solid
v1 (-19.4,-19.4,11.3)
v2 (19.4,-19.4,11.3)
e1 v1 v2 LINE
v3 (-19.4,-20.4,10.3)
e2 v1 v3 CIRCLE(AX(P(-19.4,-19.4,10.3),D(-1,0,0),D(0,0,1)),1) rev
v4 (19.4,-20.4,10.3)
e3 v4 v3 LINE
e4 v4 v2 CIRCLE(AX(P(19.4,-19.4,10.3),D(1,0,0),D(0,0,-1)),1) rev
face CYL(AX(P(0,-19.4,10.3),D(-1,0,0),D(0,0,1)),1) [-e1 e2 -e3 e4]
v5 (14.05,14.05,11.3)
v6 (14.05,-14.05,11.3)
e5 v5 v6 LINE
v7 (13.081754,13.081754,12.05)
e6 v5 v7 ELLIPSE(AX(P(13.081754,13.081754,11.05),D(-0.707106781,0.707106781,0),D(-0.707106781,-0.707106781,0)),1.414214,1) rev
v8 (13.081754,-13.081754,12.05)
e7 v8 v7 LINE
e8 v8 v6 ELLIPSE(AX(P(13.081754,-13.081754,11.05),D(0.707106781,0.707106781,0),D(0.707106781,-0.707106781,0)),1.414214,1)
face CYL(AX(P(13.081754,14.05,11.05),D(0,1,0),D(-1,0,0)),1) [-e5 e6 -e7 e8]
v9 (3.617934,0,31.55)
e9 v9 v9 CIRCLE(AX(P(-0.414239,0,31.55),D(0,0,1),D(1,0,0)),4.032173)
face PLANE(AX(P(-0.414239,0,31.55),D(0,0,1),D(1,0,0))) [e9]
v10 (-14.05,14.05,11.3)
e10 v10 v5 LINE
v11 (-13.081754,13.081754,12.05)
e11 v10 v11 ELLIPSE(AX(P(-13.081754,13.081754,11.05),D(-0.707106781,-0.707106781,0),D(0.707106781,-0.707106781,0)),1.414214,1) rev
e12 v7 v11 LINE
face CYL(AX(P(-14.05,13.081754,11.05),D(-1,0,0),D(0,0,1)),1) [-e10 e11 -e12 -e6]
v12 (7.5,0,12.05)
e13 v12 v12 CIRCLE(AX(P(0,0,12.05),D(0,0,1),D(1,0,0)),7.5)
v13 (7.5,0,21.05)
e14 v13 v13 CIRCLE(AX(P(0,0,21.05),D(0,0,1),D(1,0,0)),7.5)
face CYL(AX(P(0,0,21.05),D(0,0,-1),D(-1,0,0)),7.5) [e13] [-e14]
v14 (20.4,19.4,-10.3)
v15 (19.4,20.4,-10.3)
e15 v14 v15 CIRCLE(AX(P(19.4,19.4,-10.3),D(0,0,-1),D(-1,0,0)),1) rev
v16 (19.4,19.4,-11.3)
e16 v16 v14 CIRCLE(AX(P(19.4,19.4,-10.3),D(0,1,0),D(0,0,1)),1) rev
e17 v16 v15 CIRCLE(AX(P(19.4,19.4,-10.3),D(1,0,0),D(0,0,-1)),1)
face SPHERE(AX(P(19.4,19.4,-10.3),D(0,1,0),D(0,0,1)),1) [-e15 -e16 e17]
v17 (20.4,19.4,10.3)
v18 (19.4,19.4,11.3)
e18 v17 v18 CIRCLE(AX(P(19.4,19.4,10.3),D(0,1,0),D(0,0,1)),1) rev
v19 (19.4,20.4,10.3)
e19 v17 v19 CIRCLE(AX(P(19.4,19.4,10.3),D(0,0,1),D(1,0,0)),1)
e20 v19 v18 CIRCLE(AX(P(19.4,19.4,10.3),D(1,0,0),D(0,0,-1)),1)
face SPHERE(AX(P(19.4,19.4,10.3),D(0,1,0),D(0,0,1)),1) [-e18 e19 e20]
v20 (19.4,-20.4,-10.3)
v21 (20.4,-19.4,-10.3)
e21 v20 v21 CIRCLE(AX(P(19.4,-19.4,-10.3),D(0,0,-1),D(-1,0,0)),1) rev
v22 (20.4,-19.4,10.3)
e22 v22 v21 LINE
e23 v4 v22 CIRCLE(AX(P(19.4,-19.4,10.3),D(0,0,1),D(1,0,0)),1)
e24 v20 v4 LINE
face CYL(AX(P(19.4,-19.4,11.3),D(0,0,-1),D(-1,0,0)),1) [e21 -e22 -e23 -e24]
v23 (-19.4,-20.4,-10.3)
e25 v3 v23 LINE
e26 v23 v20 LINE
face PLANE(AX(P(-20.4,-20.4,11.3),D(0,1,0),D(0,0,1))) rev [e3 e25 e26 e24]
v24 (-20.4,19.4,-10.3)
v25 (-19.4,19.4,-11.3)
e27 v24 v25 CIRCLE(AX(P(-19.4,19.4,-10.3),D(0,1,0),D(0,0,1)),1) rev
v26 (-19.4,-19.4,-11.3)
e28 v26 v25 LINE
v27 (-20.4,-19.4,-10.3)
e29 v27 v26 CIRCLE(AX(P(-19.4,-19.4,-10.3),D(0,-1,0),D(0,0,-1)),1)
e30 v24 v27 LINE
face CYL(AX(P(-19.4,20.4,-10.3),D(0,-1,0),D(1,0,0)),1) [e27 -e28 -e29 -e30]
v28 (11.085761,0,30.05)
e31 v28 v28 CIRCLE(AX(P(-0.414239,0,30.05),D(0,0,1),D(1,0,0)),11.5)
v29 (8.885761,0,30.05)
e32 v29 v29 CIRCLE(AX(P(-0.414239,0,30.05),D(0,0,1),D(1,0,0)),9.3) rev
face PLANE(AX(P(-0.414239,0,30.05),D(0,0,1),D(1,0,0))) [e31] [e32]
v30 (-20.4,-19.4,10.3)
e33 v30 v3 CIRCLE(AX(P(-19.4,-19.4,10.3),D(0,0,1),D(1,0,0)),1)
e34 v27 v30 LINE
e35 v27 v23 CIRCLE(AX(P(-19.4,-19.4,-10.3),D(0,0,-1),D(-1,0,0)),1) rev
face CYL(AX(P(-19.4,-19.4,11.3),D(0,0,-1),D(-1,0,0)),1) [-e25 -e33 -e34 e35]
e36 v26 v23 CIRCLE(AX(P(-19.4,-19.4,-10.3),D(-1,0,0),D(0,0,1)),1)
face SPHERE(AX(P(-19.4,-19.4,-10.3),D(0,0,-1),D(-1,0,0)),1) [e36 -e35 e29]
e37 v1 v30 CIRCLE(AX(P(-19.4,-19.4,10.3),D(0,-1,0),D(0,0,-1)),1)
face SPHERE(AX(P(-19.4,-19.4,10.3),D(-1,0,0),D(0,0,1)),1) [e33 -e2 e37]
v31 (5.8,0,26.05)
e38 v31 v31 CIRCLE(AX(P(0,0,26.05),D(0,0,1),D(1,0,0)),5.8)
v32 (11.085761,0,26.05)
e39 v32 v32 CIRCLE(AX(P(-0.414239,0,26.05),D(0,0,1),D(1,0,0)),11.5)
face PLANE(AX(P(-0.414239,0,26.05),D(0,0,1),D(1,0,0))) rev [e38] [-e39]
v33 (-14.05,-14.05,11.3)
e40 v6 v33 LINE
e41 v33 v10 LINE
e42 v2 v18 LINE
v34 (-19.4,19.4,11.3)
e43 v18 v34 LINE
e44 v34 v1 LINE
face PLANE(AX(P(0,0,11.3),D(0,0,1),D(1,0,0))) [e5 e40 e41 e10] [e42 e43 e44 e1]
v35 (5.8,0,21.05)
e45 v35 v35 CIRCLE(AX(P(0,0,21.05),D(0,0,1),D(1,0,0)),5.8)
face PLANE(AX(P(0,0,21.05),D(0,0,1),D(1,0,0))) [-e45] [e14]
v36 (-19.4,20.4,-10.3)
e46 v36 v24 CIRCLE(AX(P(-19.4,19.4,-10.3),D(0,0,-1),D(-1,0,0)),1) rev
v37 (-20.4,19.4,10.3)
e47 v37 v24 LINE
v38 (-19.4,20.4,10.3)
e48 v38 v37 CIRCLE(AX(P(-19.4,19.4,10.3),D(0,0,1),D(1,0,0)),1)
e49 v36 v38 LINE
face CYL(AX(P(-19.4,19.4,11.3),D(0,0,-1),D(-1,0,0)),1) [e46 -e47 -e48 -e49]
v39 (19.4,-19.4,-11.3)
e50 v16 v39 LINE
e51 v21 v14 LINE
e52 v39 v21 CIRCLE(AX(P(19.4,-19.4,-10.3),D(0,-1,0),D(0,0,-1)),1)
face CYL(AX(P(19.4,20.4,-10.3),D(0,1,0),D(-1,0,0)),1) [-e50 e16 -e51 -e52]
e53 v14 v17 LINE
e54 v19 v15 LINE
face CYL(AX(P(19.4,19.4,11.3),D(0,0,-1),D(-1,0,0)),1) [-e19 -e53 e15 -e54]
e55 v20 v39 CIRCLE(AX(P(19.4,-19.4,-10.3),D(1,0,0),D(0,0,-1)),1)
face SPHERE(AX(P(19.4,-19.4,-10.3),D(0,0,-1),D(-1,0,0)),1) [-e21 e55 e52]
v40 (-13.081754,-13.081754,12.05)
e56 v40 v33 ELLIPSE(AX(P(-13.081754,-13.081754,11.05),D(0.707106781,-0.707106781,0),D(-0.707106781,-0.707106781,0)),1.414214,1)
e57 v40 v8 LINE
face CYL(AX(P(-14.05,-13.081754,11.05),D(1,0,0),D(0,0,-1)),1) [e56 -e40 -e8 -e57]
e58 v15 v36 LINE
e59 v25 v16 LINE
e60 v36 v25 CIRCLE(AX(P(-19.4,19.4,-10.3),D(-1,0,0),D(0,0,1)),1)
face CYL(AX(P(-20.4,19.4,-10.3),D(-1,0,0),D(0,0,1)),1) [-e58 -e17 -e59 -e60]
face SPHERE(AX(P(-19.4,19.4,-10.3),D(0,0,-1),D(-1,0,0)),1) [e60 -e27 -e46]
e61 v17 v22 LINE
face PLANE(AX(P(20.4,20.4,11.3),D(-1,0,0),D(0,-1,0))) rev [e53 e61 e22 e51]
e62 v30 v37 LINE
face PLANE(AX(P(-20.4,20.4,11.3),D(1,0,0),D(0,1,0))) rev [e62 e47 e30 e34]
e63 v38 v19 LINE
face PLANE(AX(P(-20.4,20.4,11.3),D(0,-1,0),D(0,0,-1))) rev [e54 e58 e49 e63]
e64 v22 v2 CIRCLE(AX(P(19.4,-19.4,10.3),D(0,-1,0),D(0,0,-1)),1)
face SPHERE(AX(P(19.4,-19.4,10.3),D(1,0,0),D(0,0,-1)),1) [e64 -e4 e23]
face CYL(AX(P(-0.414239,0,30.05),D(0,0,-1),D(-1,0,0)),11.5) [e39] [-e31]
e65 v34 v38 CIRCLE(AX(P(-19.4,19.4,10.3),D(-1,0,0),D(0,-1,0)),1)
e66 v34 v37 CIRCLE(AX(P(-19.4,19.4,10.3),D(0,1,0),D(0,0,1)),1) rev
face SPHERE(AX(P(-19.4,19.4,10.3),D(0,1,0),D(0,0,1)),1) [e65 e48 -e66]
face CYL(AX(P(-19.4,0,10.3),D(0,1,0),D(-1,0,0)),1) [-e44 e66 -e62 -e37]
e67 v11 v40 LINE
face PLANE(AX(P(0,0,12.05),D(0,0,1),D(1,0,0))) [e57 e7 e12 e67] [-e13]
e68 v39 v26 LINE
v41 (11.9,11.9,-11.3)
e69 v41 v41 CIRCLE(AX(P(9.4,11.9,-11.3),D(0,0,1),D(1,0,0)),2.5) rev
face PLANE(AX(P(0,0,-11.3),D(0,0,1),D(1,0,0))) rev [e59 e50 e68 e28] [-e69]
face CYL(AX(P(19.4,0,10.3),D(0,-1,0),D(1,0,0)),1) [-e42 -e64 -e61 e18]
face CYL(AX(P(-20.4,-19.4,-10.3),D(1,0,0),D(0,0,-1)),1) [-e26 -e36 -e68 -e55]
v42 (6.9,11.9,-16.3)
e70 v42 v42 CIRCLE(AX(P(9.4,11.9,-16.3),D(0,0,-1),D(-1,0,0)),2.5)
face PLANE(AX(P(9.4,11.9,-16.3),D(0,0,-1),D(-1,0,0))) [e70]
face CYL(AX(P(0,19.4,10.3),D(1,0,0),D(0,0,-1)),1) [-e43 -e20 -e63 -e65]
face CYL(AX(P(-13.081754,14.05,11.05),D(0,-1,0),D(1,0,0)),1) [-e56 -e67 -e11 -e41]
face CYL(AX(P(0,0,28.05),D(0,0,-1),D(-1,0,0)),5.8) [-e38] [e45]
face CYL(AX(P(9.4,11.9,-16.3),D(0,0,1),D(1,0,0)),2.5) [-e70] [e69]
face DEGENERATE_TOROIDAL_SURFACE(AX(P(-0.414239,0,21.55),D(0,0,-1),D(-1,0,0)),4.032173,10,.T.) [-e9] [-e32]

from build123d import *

# Parameters (mm, degrees)
CROQUIS1_W              = 40.8
CROQUIS1_H              = 40.8
SALIENTE_EXTRUIR1_DEPTH = 11.3
CROQUIS2_W              = 28.1
CROQUIS2_H              = 28.1
SALIENTE_EXTRUIR2_DEPTH = 0.75
REDONDEO1_R             = 1
CROQUIS3_R              = 7.5
SALIENTE_EXTRUIR3_DEPTH = 9
CROQUIS4_R              = 5.8
SALIENTE_EXTRUIR4_DEPTH = 7
CROQUIS5_R              = 11.5
SALIENTE_EXTRUIR5_DEPTH = 2
CROQUIS6_R              = 9.3
SALIENTE_EXTRUIR6_DEPTH = 1.5
REDONDEO4_R             = 10
CROQUIS7_R              = 2.5
SALIENTE_EXTRUIR7_DEPTH = 5
REDONDEO5_R             = 1


with BuildPart() as part:
    # Croquis1 → Saliente-Extruir1 (new, symmetric)
    with BuildSketch(Plane.XY):
        Rectangle(CROQUIS1_W, CROQUIS1_H)
    extrude(amount=SALIENTE_EXTRUIR1_DEPTH, both=True)

    # Croquis2 → Saliente-Extruir2 (add, symmetric)
    with BuildSketch(Plane.XY.offset(11.3)):
        Rectangle(CROQUIS2_W, CROQUIS2_H)
    extrude(amount=SALIENTE_EXTRUIR2_DEPTH, both=True)

    # Redondeo1
    # the kernel refuses this fillet: 1 mm, written as the material it takes off along each edge
    with BuildSketch(Plane(origin=(14.05, 16.470614591, 12.05), x_dir=(0, 0, -1), z_dir=(0, -1, 0)), Plane(origin=(-16.470614591, 14.05, 12.05), x_dir=(0, 0, -1), z_dir=(1, 0, 0)), Plane(origin=(16.470614591, -14.05, 12.05), x_dir=(0, 0, -1), z_dir=(-1, 0, 0)), Plane(origin=(-14.05, -16.470614591, 12.05), x_dir=(0, 0, -1), z_dir=(0, 1, 0))) as redondeo1_piece_1:
        with BuildLine():
            CenterArc((1, -0.968245837), REDONDEO1_R, 104.477512186, 75.522487814)
            Line((0, -0.968245837), (-0.02, -0.968245837))
            Line((-0.02, -0.968245837), (-0.02, 0))
            Line((-0.02, 0), (0, 0.02))
            ThreePointArc((0, 0.02), (0.375, 0.02), (0.745, 0.019364917))
            Line((0.745, 0.019364917), (0.75, 0))
        make_face()
    extrude(amount=32.941229183, mode=Mode.SUBTRACT)

    # Croquis3 → Saliente-Extruir3 (add)
    with BuildSketch(Plane.XY.offset(12.05)):
        Circle(CROQUIS3_R)
    extrude(amount=SALIENTE_EXTRUIR3_DEPTH)

    # Croquis4 → Saliente-Extruir4 (add)
    with BuildSketch(Plane.XY.offset(21.05)):
        Circle(CROQUIS4_R)
    extrude(amount=SALIENTE_EXTRUIR4_DEPTH)

    # Croquis5 → Saliente-Extruir5 (add, symmetric)
    with BuildSketch(Plane.XY.offset(28.05)):
        with Locations((-0.414239482, 0)):
            Circle(CROQUIS5_R)
    extrude(amount=SALIENTE_EXTRUIR5_DEPTH, both=True)

    # Croquis6 → Saliente-Extruir6 (add, symmetric)
    with BuildSketch(Plane.XY.offset(30.05)):
        with Locations((-0.414239482, 0)):
            Circle(CROQUIS6_R)
    extrude(amount=SALIENTE_EXTRUIR6_DEPTH, both=True)

    # Redondeo4
    # the kernel refuses this fillet: 10 mm, written as the material it takes off along each edge
    with BuildSketch(Plane(origin=(-0.414239482, 0, 31.55), x_dir=(1, 0, 0), z_dir=(0, -1, 0))) as redondeo4_piece_1:
        with BuildLine():
            CenterArc((4.032173124, -10), REDONDEO4_R, 58.211669383, 31.788330617)
            Line((4.032173124, 0), (4.032173124, 0.2))
            Line((4.032173124, 0.2), (9.3, 0.2))
            Line((9.3, 0.2), (9.5, 0))
            ThreePointArc((9.5, 0), (9.5, -0.75), (9.405356538, -1.33))
            Line((9.405356538, -1.33), (9.3, -1.5))
        make_face()
    revolve(axis=Axis((-0.414239482, 0, 31.55), (0, 0, 1)), mode=Mode.SUBTRACT)

    # Croquis7 → Saliente-Extruir7 (add)
    with BuildSketch(Plane(origin=(0, 0, -11.3), x_dir=(-1, 0, 0), z_dir=(0, 0, -1))):
        with Locations(Location((-9.4, 11.9, 0), (0, 0, 180))):
            Circle(CROQUIS7_R)
    extrude(amount=SALIENTE_EXTRUIR7_DEPTH)

    # Redondeo5
    redondeo5_edges = [part.edges().sort_by_distance(p)[0] for p in [
        (-20.4, 0, 11.3),
        (0, -20.4, 11.3),
        (20.4, 0, 11.3),
        (0, -20.4, -11.3),
        (-20.4, 0, -11.3),
        (0, 20.4, -11.3),
        (20.4, 0, -11.3),
        (20.4, -20.4, 0),
        (-20.4, -20.4, 0),
        (-20.4, 20.4, 0),
        (20.4, 20.4, 0),
        (0, 20.4, 11.3),
    ]]
    fillet(redondeo5_edges, radius=REDONDEO5_R)


solid = part.part
